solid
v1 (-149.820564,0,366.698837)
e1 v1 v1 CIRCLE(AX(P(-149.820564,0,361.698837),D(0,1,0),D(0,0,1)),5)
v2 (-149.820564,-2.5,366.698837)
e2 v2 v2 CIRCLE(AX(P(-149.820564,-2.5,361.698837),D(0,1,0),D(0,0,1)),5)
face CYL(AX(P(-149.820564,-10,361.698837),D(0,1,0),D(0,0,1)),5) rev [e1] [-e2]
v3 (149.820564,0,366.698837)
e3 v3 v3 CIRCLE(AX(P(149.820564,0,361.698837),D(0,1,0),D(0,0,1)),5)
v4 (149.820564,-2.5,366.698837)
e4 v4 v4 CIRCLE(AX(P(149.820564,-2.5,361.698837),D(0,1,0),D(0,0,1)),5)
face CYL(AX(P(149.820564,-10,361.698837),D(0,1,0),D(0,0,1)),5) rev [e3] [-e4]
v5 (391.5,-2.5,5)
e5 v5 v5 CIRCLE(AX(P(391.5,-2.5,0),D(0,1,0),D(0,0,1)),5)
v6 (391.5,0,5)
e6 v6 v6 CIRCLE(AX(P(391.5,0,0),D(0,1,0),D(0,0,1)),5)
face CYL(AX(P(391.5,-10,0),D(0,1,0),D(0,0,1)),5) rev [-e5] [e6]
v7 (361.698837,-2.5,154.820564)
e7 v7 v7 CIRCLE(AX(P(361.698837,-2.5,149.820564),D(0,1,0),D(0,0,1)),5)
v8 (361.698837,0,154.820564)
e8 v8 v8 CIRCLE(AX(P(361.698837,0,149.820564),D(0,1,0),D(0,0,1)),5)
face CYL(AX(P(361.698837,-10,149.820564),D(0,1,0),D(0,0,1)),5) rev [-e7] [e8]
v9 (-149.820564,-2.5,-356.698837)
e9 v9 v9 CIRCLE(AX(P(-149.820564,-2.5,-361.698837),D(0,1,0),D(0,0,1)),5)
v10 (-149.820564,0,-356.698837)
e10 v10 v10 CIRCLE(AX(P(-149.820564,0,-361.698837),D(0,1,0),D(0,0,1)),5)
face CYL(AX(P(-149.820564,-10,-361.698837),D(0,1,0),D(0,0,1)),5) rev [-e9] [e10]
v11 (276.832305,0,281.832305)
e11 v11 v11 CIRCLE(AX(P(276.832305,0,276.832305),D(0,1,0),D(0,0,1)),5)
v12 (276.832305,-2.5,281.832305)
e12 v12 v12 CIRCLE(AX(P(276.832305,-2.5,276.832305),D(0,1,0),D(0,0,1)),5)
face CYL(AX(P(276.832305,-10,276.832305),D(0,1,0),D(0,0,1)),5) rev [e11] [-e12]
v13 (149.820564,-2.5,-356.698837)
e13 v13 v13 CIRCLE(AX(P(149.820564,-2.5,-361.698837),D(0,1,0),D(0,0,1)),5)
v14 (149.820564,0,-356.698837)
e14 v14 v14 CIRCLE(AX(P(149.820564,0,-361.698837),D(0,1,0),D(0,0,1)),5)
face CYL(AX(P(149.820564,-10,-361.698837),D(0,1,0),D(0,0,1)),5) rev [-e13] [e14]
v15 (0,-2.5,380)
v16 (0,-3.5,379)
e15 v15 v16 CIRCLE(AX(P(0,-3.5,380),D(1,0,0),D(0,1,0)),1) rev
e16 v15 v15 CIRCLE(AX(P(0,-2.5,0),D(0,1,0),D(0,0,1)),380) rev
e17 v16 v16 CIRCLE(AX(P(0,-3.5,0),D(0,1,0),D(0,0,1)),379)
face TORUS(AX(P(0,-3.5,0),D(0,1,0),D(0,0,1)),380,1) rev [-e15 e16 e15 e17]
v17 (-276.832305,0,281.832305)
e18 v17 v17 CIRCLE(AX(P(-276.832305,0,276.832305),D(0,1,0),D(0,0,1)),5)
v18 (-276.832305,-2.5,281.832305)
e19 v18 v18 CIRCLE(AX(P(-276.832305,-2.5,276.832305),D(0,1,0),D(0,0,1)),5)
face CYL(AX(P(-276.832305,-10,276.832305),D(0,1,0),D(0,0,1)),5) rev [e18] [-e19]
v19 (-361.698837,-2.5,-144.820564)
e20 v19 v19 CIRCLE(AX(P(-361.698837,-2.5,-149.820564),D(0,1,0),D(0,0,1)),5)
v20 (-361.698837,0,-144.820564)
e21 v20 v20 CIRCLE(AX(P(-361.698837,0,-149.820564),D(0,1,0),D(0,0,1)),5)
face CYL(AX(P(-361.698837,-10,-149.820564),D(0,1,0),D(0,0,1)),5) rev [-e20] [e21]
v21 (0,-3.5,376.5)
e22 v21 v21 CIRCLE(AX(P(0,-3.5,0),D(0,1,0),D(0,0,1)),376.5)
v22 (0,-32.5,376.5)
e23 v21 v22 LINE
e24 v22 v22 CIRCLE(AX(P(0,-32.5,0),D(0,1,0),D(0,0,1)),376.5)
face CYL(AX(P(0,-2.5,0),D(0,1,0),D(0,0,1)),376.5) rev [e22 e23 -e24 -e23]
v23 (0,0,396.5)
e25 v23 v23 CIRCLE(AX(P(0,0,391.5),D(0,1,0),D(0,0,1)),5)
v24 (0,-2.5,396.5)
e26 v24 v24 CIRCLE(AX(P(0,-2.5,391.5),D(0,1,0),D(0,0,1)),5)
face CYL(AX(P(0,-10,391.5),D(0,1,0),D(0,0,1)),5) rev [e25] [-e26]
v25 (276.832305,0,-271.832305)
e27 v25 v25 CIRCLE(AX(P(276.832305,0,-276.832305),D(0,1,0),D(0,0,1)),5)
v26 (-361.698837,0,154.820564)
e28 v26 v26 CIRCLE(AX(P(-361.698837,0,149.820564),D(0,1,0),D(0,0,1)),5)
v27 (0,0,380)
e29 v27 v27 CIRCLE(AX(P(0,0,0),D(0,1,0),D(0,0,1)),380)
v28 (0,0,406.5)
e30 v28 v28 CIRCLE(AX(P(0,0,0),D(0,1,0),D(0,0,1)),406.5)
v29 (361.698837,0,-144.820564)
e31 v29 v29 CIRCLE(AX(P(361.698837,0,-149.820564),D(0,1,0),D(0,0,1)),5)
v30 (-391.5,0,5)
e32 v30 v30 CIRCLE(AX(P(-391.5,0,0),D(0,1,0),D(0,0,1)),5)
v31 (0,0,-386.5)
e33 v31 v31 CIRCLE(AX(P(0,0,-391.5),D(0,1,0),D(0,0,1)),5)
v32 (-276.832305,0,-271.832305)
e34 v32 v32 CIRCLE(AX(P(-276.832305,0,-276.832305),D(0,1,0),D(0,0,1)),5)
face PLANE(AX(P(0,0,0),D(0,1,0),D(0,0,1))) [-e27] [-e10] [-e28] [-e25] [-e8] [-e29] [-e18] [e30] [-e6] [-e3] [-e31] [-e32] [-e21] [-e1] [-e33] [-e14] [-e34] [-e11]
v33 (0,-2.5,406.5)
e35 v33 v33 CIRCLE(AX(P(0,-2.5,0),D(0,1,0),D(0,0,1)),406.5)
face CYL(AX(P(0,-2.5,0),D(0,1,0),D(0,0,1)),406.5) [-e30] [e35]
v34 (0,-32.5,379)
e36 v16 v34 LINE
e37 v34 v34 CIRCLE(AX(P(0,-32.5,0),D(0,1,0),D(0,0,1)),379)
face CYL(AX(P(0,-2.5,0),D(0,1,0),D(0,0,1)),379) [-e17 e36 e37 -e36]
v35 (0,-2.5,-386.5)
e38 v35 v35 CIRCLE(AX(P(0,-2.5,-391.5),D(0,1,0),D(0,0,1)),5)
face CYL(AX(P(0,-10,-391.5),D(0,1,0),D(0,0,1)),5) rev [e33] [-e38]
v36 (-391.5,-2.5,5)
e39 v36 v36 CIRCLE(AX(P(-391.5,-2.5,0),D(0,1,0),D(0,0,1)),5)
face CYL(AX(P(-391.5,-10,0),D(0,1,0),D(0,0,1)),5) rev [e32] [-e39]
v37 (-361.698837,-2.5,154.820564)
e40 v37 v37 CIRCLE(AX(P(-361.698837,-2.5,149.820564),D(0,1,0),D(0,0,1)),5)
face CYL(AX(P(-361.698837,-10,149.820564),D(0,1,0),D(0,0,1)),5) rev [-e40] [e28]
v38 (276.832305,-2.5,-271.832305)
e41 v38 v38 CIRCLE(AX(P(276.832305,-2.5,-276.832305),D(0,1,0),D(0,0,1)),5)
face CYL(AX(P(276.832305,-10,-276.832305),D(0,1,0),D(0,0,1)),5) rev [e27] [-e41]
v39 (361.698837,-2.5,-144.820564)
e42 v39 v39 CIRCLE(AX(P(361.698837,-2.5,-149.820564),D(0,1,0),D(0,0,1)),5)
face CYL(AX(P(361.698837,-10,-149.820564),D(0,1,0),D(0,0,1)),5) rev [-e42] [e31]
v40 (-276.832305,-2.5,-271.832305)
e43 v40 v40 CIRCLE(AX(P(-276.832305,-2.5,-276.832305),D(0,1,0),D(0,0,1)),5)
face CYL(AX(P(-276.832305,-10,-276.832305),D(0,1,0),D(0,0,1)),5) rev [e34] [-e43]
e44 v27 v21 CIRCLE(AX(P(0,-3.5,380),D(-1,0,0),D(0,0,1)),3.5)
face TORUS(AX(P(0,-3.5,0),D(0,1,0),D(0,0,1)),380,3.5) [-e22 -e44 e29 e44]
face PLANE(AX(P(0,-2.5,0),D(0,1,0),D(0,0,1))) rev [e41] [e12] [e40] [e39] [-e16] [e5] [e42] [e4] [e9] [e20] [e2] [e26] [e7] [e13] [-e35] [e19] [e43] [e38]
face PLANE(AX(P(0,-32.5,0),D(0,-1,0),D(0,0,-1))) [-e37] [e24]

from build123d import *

# Parameters (mm, degrees)
SKETCH1_R          = 406.5
SKETCH1_R_2        = 376.5
BASE_FLANGE1_DEPTH = 2.5
SKETCH8_R          = 5
CUT_EXTRUDE1_DEPTH = 10


# Read off the part's stored shape, not the designer's step: Edge-Flange1
# Sheet-metal steps are written as plain solids
with BuildPart() as part:
    # Sketch1 → Base-Flange1 (new body)
    with BuildSketch(Plane(origin=(0, 0, 0), x_dir=(1, 0, 0), z_dir=(0, 1, 0))):
        with Locations(Location((0, 0, 0), (0, 0, 270))):
            Circle(SKETCH1_R)
        with Locations(Location((0, 0, 0), (0, 0, 270))):
            Circle(SKETCH1_R_2, mode=Mode.SUBTRACT)
    extrude(amount=-BASE_FLANGE1_DEPTH)

    # Edge-Flange1 outline → Edge-Flange1 (revolve, cut)
    with BuildSketch(Plane.XY):
        with BuildLine():
            Line((376.5, -2.5), (376.645898034, -2.5))
            ThreePointArc((376.645898034, -2.5), (377.908349934, -0.69375696), (380, 0))
            Line((380, 0), (376.5, 0))
            Line((376.5, 0), (376.5, -2.5))
        make_face()
    revolve(axis=Axis((0, 0, 0), (0, 1, 0)), mode=Mode.SUBTRACT)

    # Edge-Flange1 2 outline → Edge-Flange1 2 (revolve)
    with BuildSketch(Plane.XY):
        with BuildLine():
            Line((376.5, -3.5), (376.5, -32.5))
            Line((376.5, -32.5), (379, -32.5))
            Line((379, -32.5), (379, -3.5))
            ThreePointArc((379, -3.5), (379.292893219, -2.792893219), (380, -2.5))
            Line((380, -2.5), (376.645898034, -2.5))
            ThreePointArc((376.645898034, -2.5), (376.536666571, -2.994706462), (376.5, -3.5))
        make_face()
    revolve(axis=Axis((0, 0, 0), (0, 1, 0)))

    # Sketch8 → Cut-Extrude1 (cut)
    with BuildSketch(Plane(origin=(0, 0, 0), x_dir=(1, 0, 0), z_dir=(0, 1, 0))):
        with Locations(Location((149.820563771, 361.698836978, 0), (0, 0, 270))):
            Circle(SKETCH8_R)
        with Locations(Location((276.832304835, 276.832304835, 0), (0, 0, 270))):
            Circle(SKETCH8_R)
        with Locations(Location((0, 391.5, 0), (0, 0, 270))):
            Circle(SKETCH8_R)
        with Locations(Location((361.698836978, 149.820563771, 0), (0, 0, 270))):
            Circle(SKETCH8_R)
        with Locations(Location((391.5, 0, 0), (0, 0, 270))):
            Circle(SKETCH8_R)
        with Locations(Location((361.698836978, -149.820563771, 0), (0, 0, 270))):
            Circle(SKETCH8_R)
        with Locations(Location((276.832304835, -276.832304835, 0), (0, 0, 270))):
            Circle(SKETCH8_R)
        with Locations(Location((149.820563771, -361.698836978, 0), (0, 0, 270))):
            Circle(SKETCH8_R)
        with Locations(Location((0, -391.5, 0), (0, 0, 270))):
            Circle(SKETCH8_R)
        with Locations(Location((-149.820563771, -361.698836978, 0), (0, 0, 270))):
            Circle(SKETCH8_R)
        with Locations(Location((-276.832304834, -276.832304835, 0), (0, 0, 270))):
            Circle(SKETCH8_R)
        with Locations(Location((-361.698836978, -149.820563771, 0), (0, 0, 270))):
            Circle(SKETCH8_R)
        with Locations(Location((-391.5, 0, 0), (0, 0, 270))):
            Circle(SKETCH8_R)
        with Locations(Location((-361.698836978, 149.820563771, 0), (0, 0, 270))):
            Circle(SKETCH8_R)
        with Locations(Location((-276.832304835, 276.832304835, 0), (0, 0, 270))):
            Circle(SKETCH8_R)
        with Locations(Location((-149.820563771, 361.698836978, 0), (0, 0, 270))):
            Circle(SKETCH8_R)
    extrude(amount=-CUT_EXTRUDE1_DEPTH, mode=Mode.SUBTRACT)


solid = part.part
